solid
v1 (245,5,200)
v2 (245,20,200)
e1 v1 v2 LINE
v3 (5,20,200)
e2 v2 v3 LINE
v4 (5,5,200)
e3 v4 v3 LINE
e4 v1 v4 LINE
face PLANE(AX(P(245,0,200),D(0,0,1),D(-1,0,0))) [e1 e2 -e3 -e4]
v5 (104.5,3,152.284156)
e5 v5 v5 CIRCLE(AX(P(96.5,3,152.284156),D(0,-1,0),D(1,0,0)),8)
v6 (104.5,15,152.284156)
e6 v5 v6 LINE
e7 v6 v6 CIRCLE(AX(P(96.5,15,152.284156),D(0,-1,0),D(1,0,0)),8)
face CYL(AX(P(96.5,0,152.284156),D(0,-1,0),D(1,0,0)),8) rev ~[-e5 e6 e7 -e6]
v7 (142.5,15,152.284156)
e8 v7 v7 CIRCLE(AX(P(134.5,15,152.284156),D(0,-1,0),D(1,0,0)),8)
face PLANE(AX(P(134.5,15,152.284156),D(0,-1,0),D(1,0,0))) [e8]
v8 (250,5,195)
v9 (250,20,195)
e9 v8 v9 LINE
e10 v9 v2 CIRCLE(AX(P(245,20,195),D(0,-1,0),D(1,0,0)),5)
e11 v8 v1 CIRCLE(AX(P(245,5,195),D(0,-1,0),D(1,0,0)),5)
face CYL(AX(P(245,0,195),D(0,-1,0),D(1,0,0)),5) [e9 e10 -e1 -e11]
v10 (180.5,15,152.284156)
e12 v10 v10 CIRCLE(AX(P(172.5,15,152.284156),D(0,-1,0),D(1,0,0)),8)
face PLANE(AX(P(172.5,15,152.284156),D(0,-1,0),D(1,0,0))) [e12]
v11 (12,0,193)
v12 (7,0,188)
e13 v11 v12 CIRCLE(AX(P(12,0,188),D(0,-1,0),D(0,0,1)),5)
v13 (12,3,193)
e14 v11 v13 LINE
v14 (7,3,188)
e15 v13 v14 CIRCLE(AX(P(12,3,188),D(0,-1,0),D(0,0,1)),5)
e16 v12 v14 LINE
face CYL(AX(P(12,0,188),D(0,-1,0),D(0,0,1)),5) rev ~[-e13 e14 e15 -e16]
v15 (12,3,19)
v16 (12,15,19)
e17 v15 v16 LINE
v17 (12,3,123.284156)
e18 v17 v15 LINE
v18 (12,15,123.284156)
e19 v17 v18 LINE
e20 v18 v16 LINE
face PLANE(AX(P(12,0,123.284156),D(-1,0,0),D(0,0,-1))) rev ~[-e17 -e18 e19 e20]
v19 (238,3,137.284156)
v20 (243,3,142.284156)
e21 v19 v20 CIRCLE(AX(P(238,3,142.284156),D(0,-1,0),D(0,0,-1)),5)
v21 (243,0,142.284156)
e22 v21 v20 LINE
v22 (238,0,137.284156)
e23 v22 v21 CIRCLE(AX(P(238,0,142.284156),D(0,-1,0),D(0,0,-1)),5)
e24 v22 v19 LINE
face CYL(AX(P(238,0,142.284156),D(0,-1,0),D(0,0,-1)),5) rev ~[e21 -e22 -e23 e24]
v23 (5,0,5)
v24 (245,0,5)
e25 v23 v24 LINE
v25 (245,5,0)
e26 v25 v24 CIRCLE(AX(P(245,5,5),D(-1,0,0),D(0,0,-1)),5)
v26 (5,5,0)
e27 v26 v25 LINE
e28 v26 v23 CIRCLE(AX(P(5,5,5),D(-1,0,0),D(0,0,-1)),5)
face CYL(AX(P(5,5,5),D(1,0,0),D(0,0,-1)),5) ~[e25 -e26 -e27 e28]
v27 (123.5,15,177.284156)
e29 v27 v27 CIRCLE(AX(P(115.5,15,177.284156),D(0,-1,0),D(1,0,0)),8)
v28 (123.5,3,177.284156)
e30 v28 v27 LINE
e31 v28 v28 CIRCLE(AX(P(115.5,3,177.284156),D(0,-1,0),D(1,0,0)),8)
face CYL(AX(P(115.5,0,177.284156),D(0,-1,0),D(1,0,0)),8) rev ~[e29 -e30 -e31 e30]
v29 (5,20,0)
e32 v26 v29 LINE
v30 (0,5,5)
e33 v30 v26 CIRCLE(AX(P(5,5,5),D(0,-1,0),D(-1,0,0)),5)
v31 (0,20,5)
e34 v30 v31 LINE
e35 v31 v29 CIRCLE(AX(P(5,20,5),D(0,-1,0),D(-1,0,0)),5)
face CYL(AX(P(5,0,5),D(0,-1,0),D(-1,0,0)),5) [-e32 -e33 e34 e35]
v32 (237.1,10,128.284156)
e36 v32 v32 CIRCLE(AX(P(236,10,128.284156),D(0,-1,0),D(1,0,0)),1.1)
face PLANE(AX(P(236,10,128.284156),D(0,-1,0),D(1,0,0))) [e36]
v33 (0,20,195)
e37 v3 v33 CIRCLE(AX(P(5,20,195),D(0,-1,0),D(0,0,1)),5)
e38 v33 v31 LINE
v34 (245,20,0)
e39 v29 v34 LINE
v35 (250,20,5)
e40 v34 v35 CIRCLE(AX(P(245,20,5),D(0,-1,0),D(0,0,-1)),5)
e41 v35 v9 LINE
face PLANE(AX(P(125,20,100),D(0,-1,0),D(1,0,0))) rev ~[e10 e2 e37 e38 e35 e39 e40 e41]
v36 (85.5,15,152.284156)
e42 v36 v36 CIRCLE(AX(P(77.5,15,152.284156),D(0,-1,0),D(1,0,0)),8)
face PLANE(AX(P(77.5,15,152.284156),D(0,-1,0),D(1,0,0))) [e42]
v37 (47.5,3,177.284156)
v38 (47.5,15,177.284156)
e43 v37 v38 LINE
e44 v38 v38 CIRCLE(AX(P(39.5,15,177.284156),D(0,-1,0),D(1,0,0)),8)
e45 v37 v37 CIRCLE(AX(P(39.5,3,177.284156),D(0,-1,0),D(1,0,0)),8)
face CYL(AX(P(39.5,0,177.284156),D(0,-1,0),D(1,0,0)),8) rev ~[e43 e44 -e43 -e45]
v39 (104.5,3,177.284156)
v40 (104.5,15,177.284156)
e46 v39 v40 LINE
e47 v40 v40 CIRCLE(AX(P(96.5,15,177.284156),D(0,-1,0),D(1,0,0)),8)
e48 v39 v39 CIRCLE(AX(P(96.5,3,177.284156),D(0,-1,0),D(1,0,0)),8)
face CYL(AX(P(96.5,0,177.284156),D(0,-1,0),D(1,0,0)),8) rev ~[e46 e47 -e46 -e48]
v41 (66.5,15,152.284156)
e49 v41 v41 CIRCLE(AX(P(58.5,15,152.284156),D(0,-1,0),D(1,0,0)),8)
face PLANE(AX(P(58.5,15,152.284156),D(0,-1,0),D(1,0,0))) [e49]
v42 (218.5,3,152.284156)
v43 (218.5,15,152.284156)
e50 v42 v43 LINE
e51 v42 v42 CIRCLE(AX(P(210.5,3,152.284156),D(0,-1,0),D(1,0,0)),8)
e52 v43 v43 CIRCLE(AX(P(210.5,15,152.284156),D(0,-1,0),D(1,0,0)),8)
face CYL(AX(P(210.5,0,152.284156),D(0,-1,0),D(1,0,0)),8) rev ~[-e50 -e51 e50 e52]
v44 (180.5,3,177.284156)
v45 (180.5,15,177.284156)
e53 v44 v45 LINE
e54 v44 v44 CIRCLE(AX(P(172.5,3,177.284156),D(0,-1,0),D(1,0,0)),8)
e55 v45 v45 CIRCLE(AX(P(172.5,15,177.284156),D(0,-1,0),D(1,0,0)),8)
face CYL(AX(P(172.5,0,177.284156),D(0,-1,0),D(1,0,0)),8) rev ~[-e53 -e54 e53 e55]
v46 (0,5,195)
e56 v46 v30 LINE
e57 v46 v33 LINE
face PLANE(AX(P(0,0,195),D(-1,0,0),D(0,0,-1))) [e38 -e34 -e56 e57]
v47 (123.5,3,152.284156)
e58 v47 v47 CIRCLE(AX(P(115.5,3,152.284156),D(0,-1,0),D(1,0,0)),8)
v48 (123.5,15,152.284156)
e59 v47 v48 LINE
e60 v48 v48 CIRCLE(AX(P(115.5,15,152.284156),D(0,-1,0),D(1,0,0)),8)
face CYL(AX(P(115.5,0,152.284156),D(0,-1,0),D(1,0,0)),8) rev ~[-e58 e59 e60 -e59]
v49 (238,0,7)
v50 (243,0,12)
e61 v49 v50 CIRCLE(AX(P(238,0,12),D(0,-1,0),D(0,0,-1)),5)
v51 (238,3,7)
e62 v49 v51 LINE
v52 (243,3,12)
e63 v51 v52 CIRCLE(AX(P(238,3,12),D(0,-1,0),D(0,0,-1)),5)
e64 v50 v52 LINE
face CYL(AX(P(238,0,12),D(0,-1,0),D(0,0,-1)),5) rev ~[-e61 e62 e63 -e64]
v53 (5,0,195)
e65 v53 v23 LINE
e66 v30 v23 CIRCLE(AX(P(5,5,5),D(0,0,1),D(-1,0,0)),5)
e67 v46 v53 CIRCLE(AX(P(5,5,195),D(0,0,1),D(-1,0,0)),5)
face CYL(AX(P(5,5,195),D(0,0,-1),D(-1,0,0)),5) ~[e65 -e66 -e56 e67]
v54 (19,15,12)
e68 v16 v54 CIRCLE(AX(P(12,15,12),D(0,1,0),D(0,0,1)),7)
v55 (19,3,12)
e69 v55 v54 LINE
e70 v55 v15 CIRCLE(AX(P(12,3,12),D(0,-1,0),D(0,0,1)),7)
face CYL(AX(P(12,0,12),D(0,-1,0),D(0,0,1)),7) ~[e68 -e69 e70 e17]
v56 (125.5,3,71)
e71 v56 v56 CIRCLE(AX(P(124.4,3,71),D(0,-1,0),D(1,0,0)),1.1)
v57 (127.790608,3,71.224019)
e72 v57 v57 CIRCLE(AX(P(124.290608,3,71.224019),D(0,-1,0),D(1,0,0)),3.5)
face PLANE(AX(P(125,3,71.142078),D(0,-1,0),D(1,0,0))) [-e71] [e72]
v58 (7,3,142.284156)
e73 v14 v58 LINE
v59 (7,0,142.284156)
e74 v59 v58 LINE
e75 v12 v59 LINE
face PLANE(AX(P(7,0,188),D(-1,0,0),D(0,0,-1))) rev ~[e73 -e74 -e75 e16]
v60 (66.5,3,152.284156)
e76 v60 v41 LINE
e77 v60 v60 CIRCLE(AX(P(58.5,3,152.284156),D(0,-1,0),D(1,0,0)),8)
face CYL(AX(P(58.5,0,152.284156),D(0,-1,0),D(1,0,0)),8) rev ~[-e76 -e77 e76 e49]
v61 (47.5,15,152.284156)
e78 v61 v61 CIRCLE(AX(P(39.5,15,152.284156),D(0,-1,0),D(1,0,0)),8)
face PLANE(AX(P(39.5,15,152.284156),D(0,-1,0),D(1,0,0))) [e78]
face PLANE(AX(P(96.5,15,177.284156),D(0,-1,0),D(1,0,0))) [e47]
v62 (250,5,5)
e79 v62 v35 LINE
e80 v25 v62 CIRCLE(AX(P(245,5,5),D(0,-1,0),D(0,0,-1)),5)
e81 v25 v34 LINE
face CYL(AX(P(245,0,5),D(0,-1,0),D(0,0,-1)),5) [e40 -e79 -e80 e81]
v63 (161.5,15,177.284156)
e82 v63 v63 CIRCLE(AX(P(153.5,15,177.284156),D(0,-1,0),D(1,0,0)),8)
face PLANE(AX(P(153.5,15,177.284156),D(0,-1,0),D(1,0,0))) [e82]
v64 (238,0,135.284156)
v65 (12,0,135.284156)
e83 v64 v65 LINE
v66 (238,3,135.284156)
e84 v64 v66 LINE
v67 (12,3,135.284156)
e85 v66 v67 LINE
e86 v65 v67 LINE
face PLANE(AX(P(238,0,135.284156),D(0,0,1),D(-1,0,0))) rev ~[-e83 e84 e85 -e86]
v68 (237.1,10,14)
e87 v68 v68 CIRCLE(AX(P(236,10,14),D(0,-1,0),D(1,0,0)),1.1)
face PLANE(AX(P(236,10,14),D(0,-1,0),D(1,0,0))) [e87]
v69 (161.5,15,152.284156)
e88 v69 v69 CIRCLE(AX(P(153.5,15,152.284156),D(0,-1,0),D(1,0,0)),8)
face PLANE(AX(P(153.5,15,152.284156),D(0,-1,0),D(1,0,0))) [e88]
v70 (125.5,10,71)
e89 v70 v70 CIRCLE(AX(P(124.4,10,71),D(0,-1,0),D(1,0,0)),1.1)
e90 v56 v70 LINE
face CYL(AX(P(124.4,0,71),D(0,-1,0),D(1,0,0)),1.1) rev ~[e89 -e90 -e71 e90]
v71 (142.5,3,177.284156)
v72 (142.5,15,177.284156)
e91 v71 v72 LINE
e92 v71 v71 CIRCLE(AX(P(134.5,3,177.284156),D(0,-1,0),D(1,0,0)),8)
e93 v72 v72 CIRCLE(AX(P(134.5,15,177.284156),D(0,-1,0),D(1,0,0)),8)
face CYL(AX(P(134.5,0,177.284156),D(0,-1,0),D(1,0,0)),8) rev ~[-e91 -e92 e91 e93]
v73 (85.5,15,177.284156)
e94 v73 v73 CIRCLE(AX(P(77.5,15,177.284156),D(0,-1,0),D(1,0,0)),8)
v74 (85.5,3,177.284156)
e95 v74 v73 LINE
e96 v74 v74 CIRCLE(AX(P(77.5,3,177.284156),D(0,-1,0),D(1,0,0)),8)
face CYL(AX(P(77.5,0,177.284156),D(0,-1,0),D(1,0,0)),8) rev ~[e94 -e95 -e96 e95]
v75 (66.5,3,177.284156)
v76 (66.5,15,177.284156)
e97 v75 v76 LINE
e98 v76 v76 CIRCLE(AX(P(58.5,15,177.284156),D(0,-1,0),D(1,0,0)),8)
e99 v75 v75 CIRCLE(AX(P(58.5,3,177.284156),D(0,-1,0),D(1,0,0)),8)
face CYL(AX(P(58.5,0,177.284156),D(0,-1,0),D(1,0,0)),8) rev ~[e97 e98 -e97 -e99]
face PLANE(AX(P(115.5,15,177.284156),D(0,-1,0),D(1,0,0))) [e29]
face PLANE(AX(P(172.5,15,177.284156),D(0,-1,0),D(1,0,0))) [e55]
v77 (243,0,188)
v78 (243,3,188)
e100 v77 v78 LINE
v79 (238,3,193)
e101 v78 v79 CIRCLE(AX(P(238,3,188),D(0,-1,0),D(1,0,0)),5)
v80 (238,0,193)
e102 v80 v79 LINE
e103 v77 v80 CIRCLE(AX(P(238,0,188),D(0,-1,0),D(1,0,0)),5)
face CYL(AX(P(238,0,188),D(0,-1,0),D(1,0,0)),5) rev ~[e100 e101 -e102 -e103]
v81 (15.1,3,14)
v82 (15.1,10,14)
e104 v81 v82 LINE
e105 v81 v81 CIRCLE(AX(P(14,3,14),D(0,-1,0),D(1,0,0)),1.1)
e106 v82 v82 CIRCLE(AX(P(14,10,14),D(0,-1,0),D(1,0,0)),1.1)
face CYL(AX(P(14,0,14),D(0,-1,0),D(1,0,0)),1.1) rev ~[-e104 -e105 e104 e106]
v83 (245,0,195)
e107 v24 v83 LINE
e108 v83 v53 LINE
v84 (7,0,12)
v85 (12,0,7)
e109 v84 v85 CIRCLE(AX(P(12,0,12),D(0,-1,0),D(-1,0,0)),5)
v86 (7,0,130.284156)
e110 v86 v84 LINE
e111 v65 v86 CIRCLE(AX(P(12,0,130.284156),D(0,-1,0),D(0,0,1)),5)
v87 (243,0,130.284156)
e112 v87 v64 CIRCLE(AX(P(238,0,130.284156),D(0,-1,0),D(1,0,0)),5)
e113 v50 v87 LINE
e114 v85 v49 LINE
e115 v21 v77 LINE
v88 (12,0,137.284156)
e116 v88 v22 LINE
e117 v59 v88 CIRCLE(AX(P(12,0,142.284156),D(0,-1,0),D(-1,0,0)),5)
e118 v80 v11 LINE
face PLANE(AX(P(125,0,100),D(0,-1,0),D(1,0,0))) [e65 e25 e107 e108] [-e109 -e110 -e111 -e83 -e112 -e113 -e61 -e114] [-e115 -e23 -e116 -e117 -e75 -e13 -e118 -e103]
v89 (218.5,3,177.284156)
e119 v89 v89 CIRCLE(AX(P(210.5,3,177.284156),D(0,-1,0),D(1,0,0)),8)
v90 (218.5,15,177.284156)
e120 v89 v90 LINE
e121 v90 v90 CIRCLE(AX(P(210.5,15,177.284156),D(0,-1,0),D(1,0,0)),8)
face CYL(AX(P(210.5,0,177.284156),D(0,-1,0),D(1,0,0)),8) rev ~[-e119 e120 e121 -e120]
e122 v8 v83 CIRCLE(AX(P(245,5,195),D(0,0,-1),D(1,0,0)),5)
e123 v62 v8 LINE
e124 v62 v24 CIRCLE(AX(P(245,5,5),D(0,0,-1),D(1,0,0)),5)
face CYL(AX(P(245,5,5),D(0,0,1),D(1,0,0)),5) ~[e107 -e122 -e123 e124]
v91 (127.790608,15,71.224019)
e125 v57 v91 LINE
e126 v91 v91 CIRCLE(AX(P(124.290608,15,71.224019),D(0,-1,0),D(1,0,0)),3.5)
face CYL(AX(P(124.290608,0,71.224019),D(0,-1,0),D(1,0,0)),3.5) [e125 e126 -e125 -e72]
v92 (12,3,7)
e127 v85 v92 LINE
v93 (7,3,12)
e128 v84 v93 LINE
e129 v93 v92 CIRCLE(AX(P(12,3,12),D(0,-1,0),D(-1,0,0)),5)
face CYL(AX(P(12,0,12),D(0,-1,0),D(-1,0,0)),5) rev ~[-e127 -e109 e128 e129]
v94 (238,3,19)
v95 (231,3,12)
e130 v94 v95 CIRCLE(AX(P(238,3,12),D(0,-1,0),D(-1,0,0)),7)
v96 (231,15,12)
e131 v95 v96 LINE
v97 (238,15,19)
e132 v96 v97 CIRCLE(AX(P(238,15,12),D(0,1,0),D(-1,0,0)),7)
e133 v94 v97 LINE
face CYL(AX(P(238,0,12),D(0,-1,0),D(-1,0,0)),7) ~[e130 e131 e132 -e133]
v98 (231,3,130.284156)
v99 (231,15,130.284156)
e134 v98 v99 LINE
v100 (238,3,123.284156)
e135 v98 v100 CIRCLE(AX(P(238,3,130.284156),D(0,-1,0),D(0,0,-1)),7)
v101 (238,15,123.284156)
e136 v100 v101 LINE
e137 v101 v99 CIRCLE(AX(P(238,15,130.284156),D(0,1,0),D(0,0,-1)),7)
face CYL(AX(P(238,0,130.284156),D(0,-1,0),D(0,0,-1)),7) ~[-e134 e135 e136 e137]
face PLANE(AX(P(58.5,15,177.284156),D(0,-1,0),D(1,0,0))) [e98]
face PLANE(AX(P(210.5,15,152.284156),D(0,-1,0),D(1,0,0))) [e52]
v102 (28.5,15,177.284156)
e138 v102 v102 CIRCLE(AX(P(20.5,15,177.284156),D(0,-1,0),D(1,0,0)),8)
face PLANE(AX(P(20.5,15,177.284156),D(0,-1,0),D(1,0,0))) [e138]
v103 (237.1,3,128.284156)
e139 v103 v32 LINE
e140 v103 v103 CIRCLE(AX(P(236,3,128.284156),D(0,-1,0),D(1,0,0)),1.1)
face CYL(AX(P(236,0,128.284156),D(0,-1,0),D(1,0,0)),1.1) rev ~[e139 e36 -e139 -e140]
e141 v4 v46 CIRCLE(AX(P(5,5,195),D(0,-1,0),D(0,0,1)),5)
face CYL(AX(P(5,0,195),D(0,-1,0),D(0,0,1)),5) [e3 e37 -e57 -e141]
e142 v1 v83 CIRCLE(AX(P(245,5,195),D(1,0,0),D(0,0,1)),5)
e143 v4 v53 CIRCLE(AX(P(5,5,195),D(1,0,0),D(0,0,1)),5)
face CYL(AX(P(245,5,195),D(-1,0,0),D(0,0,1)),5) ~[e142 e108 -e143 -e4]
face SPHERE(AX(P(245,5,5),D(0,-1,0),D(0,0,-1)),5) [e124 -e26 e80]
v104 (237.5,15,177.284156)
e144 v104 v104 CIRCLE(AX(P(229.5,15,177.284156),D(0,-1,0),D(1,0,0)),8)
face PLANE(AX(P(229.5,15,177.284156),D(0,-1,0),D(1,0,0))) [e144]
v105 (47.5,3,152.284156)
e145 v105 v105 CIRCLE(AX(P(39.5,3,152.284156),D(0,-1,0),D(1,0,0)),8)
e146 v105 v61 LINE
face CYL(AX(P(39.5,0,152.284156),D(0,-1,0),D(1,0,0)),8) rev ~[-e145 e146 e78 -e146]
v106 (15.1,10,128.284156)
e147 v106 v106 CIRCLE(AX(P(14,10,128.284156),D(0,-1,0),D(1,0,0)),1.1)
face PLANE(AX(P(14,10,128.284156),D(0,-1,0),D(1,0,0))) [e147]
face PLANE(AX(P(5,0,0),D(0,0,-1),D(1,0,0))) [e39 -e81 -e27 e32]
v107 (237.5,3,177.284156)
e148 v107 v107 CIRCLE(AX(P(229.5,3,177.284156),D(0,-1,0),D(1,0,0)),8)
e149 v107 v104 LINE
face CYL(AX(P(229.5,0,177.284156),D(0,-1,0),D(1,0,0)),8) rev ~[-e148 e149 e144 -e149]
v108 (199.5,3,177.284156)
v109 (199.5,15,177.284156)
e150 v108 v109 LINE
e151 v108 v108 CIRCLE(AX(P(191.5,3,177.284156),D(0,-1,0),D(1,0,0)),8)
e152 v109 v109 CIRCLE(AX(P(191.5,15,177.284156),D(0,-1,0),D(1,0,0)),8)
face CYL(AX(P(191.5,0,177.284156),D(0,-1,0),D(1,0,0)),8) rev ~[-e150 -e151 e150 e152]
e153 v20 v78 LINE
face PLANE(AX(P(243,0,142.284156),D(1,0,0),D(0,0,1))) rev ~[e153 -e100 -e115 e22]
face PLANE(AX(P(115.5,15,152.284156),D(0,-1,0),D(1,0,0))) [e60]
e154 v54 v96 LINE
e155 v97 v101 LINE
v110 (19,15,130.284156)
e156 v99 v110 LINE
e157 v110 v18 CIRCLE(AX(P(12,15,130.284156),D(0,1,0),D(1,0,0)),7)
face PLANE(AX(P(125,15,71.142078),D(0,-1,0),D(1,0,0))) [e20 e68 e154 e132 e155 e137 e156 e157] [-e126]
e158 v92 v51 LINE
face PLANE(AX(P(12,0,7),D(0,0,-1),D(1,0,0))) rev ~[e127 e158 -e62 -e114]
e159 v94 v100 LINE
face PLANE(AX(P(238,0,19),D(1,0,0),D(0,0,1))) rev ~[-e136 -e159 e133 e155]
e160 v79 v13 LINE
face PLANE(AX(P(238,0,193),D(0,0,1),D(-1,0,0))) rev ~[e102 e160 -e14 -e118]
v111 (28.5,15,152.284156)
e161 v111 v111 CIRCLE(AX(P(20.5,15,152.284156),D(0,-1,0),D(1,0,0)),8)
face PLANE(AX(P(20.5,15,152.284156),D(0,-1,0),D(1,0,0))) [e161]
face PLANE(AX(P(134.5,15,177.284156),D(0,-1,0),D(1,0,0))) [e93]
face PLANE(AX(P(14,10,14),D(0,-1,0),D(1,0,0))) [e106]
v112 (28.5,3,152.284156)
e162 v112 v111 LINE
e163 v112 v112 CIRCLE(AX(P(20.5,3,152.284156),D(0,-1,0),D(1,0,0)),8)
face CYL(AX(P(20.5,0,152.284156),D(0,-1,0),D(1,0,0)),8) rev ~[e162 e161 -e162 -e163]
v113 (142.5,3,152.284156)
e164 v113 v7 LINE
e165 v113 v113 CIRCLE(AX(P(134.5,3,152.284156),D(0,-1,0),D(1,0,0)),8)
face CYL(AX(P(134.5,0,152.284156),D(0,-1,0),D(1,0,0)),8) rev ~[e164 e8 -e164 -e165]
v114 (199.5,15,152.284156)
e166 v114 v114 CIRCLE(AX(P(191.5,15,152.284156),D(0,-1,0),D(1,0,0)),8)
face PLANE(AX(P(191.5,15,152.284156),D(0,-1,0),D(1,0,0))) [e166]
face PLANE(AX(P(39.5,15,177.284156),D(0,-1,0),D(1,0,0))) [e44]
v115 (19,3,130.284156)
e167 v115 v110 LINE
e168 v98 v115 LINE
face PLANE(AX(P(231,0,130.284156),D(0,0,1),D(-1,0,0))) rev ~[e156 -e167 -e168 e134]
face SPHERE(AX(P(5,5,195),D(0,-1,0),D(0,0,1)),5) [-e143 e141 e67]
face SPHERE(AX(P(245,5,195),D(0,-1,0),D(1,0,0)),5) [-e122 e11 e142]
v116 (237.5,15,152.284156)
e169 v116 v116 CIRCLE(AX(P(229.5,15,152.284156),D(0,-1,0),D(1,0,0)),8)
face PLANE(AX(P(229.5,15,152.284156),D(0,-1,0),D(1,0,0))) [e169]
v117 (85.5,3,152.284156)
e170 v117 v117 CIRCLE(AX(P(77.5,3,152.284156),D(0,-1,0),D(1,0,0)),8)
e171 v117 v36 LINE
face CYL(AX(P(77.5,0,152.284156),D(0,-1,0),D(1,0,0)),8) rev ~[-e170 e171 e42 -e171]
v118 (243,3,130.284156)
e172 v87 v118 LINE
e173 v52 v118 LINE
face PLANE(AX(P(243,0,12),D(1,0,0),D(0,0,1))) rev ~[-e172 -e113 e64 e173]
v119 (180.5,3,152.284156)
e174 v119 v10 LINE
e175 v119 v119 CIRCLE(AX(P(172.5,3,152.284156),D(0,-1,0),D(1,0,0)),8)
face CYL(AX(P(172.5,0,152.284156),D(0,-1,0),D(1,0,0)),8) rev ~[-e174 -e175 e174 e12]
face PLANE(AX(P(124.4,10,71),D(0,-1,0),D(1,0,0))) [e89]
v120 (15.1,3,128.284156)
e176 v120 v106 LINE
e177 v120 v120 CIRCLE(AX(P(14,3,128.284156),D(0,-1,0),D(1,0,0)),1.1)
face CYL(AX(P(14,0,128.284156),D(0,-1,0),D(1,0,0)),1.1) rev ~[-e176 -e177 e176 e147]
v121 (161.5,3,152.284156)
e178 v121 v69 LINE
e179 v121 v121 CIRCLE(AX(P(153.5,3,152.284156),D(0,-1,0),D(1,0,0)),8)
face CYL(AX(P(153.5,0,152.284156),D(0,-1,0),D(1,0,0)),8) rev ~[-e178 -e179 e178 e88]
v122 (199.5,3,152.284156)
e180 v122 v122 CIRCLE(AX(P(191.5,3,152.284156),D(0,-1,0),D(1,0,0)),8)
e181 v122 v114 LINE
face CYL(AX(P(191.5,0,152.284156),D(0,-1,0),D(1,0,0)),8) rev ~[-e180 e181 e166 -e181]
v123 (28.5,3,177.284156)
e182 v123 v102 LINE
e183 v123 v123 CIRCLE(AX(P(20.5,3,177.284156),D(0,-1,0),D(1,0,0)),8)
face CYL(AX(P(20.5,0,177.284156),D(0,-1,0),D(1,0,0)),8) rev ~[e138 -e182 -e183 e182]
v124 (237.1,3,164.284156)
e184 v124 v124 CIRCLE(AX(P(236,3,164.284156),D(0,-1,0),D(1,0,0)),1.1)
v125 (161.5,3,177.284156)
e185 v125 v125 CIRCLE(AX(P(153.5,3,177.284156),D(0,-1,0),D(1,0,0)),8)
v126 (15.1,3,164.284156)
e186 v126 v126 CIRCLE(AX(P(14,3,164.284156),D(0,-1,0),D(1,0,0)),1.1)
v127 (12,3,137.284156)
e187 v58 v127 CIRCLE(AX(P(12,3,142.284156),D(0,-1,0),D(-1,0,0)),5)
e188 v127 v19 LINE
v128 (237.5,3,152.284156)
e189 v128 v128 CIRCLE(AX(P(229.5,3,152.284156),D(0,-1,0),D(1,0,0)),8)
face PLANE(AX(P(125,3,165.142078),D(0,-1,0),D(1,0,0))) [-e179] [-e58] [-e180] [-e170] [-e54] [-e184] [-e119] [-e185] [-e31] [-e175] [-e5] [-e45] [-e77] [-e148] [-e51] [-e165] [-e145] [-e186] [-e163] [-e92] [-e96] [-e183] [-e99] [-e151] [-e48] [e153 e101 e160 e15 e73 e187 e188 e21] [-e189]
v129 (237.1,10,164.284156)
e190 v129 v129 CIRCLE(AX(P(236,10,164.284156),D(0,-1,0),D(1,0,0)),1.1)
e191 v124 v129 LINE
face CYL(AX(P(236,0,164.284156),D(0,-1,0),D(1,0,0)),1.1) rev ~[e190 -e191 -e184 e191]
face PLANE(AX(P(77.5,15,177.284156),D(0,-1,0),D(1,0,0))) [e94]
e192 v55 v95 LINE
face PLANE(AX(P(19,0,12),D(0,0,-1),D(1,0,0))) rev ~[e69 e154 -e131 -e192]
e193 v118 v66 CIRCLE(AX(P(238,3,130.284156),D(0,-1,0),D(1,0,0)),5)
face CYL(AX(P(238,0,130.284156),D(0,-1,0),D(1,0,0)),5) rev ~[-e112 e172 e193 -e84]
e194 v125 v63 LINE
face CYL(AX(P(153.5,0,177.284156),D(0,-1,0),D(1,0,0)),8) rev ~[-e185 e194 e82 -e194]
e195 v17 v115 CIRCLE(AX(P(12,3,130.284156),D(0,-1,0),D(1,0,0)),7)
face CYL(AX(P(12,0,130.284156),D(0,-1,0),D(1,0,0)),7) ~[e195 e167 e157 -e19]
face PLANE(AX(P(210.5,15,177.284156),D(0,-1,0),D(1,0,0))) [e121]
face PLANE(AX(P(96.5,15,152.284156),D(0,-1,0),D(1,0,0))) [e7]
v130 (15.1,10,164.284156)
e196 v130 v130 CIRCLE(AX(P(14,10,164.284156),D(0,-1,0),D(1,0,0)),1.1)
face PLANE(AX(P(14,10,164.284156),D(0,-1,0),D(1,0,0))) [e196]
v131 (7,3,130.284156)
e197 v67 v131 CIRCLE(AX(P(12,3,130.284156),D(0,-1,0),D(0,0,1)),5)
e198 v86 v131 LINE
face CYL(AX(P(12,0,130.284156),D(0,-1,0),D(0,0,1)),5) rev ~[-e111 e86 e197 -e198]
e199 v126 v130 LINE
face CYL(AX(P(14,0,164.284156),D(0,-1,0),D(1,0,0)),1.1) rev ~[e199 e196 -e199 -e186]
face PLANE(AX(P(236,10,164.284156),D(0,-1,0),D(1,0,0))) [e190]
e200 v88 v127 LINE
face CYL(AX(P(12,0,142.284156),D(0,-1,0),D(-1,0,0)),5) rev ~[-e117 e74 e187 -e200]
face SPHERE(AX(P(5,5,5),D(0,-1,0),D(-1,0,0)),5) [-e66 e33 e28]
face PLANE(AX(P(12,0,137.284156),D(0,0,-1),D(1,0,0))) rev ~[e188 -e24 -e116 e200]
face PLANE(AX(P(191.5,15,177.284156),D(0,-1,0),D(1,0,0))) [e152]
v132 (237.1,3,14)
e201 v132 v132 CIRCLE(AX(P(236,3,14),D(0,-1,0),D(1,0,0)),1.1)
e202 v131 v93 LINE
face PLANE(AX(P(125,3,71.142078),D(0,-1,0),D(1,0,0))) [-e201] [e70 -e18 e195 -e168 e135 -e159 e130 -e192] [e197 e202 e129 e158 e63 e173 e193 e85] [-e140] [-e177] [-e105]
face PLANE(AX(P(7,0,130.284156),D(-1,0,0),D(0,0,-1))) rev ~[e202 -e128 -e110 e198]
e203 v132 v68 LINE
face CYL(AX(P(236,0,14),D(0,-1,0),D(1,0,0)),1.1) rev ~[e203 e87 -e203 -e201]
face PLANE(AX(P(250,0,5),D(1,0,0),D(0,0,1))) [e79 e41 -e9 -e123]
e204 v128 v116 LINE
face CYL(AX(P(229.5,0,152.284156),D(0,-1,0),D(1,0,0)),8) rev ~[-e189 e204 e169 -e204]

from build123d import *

# Parameters (mm, degrees)
F1_DEPTH = 20
F2_R     = 5
F5_DEPTH = 3
F6_R     = 8
F6_R_2   = 3.5
F7_DEPTH = 15
F8_R     = 1.1
F9_DEPTH = 10


with BuildPart() as f1:
    # F0 (on Front) → F1 (new body)
    with BuildSketch(Plane.XZ):
        with BuildLine():
            ThreePointArc((0, 5), (1.4644660941, 1.4644660941), (5, 0))
            Line((5, 0), (245, 0))
            ThreePointArc((245, 0), (248.5355339059, 1.4644660941), (250, 5))
            Line((250, 5), (250, 195))
            ThreePointArc((250, 195), (248.5355339059, 198.5355339059), (245, 200))
            Line((245, 200), (5, 200))
            ThreePointArc((5, 200), (1.4644660941, 198.5355339059), (0, 195))
            Line((0, 195), (0, 5))
        make_face()
    extrude(amount=-F1_DEPTH)

    # F2
    f2_edges = [f1.edges().sort_by_distance(p)[0] for p in [
        (0, 0, 100),
        (1.464466, 0, 1.464466),
        (125, 0, 0),
        (248.535534, 0, 1.464466),
        (250, 0, 100),
        (248.535534, 0, 198.535534),
        (125, 0, 200),
        (1.464466, 0, 198.535534),
    ]]
    fillet(f2_edges, radius=F2_R)

    # F4 (on face) → F5 (cut)
    with BuildSketch(Plane.XZ):
        with BuildLine():
            ThreePointArc((243, 188), (241.5355339059, 191.5355339059), (238, 193))
            Line((238, 193), (12, 193))
            ThreePointArc((12, 193), (8.4644660941, 191.5355339059), (7, 188))
            Line((7, 188), (7, 142.2841556072))
            ThreePointArc((7, 142.2841556072), (8.4644660941, 138.7486217013), (12, 137.2841556072))
            Line((12, 137.2841556072), (238, 137.2841556072))
            ThreePointArc((238, 137.2841556072), (241.5355339059, 138.7486217013), (243, 142.2841556072))
            Line((243, 142.2841556072), (243, 188))
        make_face()
        with BuildLine():
            ThreePointArc((238, 7), (241.5355339059, 8.4644660941), (243, 12))
            Line((243, 12), (243, 130.2841556072))
            ThreePointArc((243, 130.2841556072), (241.5355339059, 133.8196895132), (238, 135.2841556072))
            Line((238, 135.2841556072), (12, 135.2841556072))
            ThreePointArc((12, 135.2841556072), (8.4644660941, 133.8196895132), (7, 130.2841556072))
            Line((7, 130.2841556072), (7, 12))
            ThreePointArc((7, 12), (8.4644660941, 8.4644660941), (12, 7))
            Line((12, 7), (238, 7))
        make_face()
    extrude(amount=-F5_DEPTH, mode=Mode.SUBTRACT)

    # F6 (on face) → F7 (cut)
    with BuildSketch(Plane.XZ):
        with Locations((20.5, 152.2841556072)):
            Circle(F6_R)
        with Locations((20.5, 177.2841556072)):
            Circle(F6_R)
        with Locations((39.5, 152.2841556072)):
            Circle(F6_R)
        with Locations((39.5, 177.2841556072)):
            Circle(F6_R)
        with Locations((58.5, 152.2841556072)):
            Circle(F6_R)
        with Locations((58.5, 177.2841556072)):
            Circle(F6_R)
        with Locations((77.5, 152.2841556072)):
            Circle(F6_R)
        with Locations((77.5, 177.2841556072)):
            Circle(F6_R)
        with Locations((96.5, 152.2841556072)):
            Circle(F6_R)
        with Locations((96.5, 177.2841556072)):
            Circle(F6_R)
        with Locations((115.5, 152.2841556072)):
            Circle(F6_R)
        with Locations((115.5, 177.2841556072)):
            Circle(F6_R)
        with Locations((134.5, 152.2841556072)):
            Circle(F6_R)
        with Locations((134.5, 177.2841556072)):
            Circle(F6_R)
        with Locations((153.5, 152.2841556072)):
            Circle(F6_R)
        with Locations((153.5, 177.2841556072)):
            Circle(F6_R)
        with Locations((172.5, 152.2841556072)):
            Circle(F6_R)
        with Locations((172.5, 177.2841556072)):
            Circle(F6_R)
        with Locations((191.5, 152.2841556072)):
            Circle(F6_R)
        with Locations((191.5, 177.2841556072)):
            Circle(F6_R)
        with Locations((210.5, 152.2841556072)):
            Circle(F6_R)
        with Locations((210.5, 177.2841556072)):
            Circle(F6_R)
        with Locations((229.5, 152.2841556072)):
            Circle(F6_R)
        with Locations((229.5, 177.2841556072)):
            Circle(F6_R)
        with BuildLine():
            Line((231, 130.2841556072), (19, 130.2841556072))
            ThreePointArc((19, 130.2841556072), (16.9497474683, 125.3344081389), (12, 123.2841556072))
            Line((12, 123.2841556072), (12, 19))
            ThreePointArc((12, 19), (16.9497474683, 16.9497474683), (19, 12))
            Line((19, 12), (231, 12))
            ThreePointArc((231, 12), (233.0502525317, 16.9497474683), (238, 19))
            Line((238, 19), (238, 123.2841556072))
            ThreePointArc((238, 123.2841556072), (233.0502525317, 125.3344081389), (231, 130.2841556072))
        make_face()
        with Locations((124.2906078696, 71.2240189314)):
            Circle(F6_R_2, mode=Mode.SUBTRACT)
    extrude(amount=-F7_DEPTH, mode=Mode.SUBTRACT)

    # F8 (on face) → F9 (cut)
    with BuildSketch(Plane.XZ):
        with Locations((14, 128.2841556072)):
            Circle(F8_R)
        with Locations((14, 14)):
            Circle(F8_R)
        with Locations((124.4, 71)):
            Circle(F8_R)
        with Locations((236, 14)):
            Circle(F8_R)
        with Locations((236, 128.2841556072)):
            Circle(F8_R)
        with Locations((236, 164.2841556072)):
            Circle(F8_R)
        with Locations((14, 164.2841556072)):
            Circle(F8_R)
    extrude(amount=-F9_DEPTH, mode=Mode.SUBTRACT)


solid = f1.part
